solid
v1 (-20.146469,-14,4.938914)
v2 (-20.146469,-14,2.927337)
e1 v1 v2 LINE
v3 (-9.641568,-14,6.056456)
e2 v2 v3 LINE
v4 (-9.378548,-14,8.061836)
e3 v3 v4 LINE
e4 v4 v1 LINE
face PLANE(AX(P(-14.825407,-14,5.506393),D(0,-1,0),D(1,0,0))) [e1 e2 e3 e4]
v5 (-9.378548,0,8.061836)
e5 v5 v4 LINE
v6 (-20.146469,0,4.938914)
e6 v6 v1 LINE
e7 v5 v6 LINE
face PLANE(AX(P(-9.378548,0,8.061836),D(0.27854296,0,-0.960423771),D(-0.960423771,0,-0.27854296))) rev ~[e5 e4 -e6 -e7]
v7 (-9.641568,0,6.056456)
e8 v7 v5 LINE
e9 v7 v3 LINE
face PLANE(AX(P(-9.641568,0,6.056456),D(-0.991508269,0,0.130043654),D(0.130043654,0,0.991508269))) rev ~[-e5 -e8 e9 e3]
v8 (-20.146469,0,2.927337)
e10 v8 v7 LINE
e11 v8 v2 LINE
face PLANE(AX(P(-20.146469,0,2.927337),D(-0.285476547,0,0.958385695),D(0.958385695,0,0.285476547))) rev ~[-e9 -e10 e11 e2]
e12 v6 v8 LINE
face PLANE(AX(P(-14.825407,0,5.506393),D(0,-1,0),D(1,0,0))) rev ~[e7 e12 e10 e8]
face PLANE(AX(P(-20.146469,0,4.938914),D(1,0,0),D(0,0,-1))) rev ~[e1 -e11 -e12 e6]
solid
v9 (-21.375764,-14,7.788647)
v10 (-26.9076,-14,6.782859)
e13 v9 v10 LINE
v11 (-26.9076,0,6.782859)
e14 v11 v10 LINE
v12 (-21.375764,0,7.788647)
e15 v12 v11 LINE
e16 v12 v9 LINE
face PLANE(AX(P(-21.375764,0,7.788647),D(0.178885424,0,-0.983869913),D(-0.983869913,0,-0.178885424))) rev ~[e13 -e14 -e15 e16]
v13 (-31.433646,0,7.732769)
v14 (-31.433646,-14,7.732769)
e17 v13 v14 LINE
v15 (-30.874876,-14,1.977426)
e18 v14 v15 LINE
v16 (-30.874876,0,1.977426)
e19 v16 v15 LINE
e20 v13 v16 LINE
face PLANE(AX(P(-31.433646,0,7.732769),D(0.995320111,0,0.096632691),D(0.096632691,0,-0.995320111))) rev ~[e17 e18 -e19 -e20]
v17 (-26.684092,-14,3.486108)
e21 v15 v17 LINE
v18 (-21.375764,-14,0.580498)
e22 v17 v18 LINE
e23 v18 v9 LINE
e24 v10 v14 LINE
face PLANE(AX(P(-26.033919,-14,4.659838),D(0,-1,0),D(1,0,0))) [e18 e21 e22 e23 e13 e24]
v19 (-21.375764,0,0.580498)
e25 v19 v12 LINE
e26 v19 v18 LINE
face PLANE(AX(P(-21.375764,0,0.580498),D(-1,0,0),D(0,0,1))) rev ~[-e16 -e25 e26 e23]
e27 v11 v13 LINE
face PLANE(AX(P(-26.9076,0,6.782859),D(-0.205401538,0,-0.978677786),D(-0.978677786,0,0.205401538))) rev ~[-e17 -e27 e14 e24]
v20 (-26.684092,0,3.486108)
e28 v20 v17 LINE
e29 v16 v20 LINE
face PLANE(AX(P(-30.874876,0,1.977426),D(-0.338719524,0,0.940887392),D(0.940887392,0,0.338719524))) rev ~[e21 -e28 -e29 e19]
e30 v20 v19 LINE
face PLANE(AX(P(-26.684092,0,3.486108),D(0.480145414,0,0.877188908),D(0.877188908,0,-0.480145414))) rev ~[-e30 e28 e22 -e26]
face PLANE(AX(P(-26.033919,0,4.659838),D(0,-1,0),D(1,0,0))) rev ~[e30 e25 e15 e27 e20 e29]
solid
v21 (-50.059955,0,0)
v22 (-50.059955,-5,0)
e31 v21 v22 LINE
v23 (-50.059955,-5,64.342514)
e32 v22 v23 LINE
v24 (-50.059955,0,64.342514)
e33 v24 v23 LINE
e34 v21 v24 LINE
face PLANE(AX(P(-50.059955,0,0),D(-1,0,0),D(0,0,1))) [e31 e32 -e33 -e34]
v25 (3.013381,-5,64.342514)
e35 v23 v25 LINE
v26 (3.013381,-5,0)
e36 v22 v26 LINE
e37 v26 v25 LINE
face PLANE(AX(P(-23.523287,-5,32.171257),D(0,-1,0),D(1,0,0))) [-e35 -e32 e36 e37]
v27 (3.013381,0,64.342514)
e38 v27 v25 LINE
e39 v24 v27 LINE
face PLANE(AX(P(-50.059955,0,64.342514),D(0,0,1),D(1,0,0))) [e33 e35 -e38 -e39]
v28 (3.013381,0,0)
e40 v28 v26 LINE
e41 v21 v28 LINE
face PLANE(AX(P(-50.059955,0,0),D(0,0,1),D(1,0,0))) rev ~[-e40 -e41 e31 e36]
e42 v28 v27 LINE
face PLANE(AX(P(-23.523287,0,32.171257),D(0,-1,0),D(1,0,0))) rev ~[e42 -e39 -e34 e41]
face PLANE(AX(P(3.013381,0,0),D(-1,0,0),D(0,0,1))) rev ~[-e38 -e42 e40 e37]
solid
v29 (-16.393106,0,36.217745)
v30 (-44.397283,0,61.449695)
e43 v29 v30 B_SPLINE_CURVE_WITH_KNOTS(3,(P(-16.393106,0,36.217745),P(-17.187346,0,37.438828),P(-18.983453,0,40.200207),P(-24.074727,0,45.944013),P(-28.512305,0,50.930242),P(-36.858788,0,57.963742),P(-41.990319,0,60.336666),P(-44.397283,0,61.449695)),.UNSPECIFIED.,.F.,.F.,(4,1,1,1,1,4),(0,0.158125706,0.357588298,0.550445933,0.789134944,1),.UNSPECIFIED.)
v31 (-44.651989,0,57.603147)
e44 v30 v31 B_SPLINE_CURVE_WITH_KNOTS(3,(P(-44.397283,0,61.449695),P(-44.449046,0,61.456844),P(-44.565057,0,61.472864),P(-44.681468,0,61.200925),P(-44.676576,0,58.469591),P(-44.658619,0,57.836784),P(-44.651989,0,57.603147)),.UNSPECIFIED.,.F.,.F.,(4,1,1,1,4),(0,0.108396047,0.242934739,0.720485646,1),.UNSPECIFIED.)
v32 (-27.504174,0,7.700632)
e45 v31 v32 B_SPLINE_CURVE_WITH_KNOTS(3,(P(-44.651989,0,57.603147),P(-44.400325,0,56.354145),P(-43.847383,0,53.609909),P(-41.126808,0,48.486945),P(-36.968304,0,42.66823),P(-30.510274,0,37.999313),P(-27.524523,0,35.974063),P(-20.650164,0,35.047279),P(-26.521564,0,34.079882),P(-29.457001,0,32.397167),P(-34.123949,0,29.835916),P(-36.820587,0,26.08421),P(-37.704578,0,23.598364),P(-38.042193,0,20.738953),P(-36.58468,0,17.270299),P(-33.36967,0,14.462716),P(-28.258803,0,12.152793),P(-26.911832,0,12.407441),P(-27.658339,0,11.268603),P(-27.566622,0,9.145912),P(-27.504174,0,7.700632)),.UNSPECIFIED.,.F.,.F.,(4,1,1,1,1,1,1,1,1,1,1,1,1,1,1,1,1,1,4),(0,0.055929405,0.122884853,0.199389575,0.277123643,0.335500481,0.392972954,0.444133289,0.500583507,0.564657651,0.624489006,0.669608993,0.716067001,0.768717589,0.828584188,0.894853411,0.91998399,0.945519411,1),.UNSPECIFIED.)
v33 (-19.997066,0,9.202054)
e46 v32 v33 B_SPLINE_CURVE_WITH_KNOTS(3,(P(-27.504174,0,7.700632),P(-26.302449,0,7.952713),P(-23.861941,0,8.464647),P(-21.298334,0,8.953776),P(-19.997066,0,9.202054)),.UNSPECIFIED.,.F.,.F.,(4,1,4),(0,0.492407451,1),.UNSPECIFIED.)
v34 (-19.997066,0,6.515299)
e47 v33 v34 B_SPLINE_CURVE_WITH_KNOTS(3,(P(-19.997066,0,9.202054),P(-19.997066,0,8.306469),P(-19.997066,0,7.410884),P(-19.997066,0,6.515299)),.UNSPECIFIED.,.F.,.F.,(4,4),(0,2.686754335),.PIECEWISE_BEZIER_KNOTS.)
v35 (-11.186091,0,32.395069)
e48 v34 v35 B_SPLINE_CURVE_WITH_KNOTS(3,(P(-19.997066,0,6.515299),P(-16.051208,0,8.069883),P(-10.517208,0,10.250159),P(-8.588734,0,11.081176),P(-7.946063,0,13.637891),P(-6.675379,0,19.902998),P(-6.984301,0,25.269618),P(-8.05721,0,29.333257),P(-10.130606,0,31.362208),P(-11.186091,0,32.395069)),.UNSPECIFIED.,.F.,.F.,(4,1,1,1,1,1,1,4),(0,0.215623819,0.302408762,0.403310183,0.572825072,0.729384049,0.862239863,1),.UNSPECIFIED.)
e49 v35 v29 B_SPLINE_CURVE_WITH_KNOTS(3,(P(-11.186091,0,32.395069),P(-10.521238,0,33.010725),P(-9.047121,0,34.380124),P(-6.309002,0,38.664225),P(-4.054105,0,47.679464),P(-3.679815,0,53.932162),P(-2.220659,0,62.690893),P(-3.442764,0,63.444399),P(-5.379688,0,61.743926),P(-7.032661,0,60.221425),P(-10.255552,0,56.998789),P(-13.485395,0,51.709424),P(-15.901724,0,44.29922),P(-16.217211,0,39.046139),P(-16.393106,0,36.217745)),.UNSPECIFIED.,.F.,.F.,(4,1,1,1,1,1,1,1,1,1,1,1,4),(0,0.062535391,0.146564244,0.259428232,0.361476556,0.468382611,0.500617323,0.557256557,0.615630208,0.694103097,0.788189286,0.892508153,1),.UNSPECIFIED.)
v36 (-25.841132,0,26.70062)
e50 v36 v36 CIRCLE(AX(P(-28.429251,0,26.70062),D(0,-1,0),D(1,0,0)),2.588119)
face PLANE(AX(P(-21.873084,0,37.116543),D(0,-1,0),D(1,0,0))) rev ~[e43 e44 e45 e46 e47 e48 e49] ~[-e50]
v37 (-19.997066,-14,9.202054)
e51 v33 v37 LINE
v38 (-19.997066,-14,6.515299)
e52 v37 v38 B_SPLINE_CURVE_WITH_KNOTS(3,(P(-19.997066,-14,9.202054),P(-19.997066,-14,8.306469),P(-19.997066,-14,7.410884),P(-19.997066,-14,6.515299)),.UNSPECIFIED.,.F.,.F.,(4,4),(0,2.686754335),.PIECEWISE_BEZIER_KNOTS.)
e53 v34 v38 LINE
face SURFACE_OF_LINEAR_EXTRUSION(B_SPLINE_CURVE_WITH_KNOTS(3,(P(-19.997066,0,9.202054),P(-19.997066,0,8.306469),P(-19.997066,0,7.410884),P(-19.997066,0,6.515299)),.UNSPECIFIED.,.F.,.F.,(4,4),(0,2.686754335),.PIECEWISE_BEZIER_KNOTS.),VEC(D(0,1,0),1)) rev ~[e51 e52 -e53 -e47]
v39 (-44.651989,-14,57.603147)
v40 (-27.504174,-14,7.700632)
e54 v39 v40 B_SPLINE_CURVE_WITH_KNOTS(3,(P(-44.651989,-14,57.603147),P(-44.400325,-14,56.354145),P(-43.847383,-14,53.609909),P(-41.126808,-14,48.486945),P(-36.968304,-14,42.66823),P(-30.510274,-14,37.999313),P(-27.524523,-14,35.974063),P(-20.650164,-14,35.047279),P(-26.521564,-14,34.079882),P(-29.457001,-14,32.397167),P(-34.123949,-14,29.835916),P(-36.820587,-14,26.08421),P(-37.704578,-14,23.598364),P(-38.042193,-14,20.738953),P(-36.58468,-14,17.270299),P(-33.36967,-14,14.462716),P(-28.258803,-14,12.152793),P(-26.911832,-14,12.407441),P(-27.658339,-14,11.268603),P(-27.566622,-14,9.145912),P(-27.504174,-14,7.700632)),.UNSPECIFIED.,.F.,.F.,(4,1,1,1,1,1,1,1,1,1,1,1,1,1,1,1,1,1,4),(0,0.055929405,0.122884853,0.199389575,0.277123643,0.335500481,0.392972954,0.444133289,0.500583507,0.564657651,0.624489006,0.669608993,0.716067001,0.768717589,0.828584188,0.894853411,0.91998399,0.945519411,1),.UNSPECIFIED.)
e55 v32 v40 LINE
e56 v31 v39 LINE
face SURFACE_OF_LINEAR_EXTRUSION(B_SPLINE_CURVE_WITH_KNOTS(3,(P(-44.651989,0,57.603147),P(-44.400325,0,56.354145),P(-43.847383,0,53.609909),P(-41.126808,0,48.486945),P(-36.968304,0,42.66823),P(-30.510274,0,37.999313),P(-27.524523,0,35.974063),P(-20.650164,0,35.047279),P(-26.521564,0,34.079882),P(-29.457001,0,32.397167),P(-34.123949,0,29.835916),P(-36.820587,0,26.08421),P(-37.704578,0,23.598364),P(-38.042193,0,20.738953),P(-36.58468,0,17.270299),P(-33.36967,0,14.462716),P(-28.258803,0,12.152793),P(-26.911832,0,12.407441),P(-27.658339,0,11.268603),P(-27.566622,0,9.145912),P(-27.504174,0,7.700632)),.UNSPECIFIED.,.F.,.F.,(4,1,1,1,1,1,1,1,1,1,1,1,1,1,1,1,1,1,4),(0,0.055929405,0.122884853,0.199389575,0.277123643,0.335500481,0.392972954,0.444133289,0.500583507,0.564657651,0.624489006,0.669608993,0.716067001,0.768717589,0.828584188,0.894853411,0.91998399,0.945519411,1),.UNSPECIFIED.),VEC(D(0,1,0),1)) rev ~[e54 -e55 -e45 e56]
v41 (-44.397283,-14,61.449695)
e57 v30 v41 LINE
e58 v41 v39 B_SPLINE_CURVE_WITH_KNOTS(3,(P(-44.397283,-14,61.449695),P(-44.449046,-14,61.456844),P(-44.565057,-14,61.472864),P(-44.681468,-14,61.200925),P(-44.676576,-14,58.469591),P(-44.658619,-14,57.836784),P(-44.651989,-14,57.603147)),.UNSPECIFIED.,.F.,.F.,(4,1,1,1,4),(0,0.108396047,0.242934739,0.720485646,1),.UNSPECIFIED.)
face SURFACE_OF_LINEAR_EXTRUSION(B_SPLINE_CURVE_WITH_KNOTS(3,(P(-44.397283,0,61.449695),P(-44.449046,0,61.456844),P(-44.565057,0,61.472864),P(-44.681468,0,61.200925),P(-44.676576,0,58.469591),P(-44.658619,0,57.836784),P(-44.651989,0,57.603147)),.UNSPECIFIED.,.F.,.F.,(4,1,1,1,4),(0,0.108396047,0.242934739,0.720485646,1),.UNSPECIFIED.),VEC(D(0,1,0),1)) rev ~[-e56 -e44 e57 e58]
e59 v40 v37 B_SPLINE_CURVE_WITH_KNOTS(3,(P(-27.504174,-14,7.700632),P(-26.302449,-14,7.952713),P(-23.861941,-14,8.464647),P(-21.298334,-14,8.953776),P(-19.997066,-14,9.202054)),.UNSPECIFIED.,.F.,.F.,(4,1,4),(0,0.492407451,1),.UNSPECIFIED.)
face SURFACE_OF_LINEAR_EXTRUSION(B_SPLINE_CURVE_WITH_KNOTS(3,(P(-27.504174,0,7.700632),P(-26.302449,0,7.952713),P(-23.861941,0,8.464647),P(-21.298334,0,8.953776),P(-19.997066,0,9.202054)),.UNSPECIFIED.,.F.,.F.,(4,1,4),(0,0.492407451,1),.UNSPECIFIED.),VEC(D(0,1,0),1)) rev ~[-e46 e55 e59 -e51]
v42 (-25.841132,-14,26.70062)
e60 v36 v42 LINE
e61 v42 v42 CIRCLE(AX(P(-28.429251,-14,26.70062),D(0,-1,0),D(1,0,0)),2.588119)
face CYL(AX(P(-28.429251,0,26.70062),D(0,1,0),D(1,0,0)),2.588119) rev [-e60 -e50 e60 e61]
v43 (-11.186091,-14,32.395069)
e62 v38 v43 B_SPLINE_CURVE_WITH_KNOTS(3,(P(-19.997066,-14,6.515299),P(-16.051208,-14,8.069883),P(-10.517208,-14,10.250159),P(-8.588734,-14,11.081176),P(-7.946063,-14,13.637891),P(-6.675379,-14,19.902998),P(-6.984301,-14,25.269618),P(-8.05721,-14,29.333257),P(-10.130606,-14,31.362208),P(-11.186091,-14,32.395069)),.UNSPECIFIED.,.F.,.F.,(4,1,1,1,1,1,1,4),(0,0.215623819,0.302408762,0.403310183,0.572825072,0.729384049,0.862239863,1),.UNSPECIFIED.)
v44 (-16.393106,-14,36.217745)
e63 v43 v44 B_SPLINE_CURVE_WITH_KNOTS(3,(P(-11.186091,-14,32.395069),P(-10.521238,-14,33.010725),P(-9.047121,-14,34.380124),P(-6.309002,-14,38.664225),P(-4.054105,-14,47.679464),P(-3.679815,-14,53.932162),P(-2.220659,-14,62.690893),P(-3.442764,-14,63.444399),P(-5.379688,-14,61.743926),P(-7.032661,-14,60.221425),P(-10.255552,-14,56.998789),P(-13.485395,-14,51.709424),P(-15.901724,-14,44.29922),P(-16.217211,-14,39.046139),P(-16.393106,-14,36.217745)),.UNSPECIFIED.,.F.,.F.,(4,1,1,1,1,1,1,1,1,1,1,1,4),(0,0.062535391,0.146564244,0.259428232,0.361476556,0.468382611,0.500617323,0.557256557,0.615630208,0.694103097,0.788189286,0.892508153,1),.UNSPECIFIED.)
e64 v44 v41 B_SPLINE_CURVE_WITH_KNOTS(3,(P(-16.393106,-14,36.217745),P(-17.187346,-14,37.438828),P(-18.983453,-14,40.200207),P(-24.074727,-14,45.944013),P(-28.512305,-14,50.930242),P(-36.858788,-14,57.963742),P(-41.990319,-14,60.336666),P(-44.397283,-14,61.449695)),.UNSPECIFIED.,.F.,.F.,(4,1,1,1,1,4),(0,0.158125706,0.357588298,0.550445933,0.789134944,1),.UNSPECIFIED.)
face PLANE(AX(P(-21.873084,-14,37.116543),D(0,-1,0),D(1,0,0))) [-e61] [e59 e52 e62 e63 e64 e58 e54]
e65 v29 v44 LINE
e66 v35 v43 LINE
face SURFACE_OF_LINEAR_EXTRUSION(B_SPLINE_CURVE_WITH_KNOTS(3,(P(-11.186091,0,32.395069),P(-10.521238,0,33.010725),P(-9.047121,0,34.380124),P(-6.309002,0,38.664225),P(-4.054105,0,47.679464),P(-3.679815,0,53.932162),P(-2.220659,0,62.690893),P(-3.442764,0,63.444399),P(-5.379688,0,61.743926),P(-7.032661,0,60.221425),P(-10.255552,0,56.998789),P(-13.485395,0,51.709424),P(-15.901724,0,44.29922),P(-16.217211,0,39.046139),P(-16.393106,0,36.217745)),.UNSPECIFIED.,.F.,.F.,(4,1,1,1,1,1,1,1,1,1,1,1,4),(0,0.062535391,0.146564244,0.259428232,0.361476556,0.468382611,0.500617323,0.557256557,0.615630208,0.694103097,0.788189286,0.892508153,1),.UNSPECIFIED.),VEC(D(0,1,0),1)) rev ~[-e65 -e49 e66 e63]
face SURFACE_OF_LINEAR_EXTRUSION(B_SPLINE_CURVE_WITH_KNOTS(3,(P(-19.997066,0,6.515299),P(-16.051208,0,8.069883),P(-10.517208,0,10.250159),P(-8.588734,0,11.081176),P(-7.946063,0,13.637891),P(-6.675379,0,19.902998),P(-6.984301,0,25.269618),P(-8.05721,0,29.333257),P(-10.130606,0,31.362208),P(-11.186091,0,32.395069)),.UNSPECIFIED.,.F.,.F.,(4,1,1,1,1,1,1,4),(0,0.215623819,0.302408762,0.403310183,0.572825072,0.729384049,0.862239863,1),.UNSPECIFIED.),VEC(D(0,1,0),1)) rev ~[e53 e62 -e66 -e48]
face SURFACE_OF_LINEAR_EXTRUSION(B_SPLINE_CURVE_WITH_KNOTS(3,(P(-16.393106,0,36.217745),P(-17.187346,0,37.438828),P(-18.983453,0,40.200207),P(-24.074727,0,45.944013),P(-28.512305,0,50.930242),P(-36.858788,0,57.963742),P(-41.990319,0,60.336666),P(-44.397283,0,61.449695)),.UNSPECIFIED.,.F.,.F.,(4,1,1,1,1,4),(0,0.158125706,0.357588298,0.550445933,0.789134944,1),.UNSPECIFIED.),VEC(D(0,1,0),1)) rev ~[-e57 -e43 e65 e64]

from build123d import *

# Parameters (mm, degrees)
F0_R     = 2.5881190518
F1_DEPTH = 14
F2_W     = 53.0733359046
F2_H     = 64.3425136805
F3_DEPTH = 5


# Not quite as in the source:
# - a feature names something its author has since deleted; it is built from what else it names


with BuildPart() as f1:
    # F0 (on Front) → F1 (new body)
    with BuildSketch(Plane.XZ):
        with BuildLine():
            add(Edge.make_bspline(
                [(-44.3972833455, 61.4496953785), (-44.4490464675, 61.4568435425), (-44.565056792, 61.4728638439), (-44.681468286, 61.2009254932), (-44.6765757123, 58.4695911448), (-44.658618745, 57.8367841289), (-44.6519888937, 57.6031468809)],
                knots=[0, 0, 0, 0, 0.1083960468, 0.2429347395, 0.7204856463, 1, 1, 1, 1], degree=3))
            add(Edge.make_bspline(
                [(-44.6519888937, 57.6031468809), (-44.4003246793, 56.3541446109), (-43.8473826271, 53.6099090822), (-41.126808261, 48.4869449794), (-36.9683037207, 42.6682303212), (-30.5102740969, 37.9993132704), (-27.5245233409, 35.9740625461), (-20.6501644663, 35.0472789539), (-26.5215643921, 34.07988225), (-29.4570014209, 32.3971668125), (-34.1239486196, 29.8359159403), (-36.8205871097, 26.084209941), (-37.7045777644, 23.5983639301), (-38.0421931941, 20.7389531569), (-36.5846802801, 17.270299258), (-33.3696698148, 14.4627164238), (-28.2588031256, 12.1527927032), (-26.9118321529, 12.4074409024), (-27.6583389074, 11.2686028265), (-27.5666216616, 9.1459115136), (-27.5041740388, 7.7006323263)],
                knots=[0, 0, 0, 0, 0.0559294052, 0.1228848533, 0.1993895751, 0.2771236427, 0.3355004813, 0.3929729537, 0.4441332892, 0.5005835066, 0.5646576506, 0.6244890061, 0.669608993, 0.7160670006, 0.7687175891, 0.8285841882, 0.8948534111, 0.9199839904, 0.9455194108, 1, 1, 1, 1], degree=3))
            add(Edge.make_bspline(
                [(-27.5041740388, 7.7006323263), (-26.3024494279, 7.9527125617), (-23.8619408464, 8.4646468037), (-21.2983337476, 8.9537756253), (-19.9970658869, 9.2020537704)],
                knots=[0, 0, 0, 0, 0.4924074514, 1, 1, 1, 1], degree=3))
            add(Edge.make_bspline(
                [(-19.9970658869, 9.2020537704), (-19.9970658869, 8.3064689922), (-19.9970658869, 7.4108842139), (-19.9970658869, 6.5152994357)],
                knots=[0, 0, 0, 0, 2.6867543347, 2.6867543347, 2.6867543347, 2.6867543347], degree=3))
            add(Edge.make_bspline(
                [(-19.9970658869, 6.5152994357), (-16.0512076561, 8.0698825341), (-10.5172081741, 10.2501590564), (-8.5887342269, 11.0811763191), (-7.9460625464, 13.6378911094), (-6.6753789765, 19.9029977792), (-6.9843010939, 25.2696178352), (-8.0572100828, 29.3332570636), (-10.1306055922, 31.3622079575), (-11.1860912293, 32.3950685561)],
                knots=[0, 0, 0, 0, 0.2156238193, 0.3024087624, 0.4033101833, 0.5728250723, 0.7293840486, 0.8622398628, 1, 1, 1, 1], degree=3))
            add(Edge.make_bspline(
                [(-11.1860912293, 32.3950685561), (-10.5212378252, 33.0107248909), (-9.0471212528, 34.3801242718), (-6.3090018579, 38.6642251737), (-4.0541052944, 47.6794637923), (-3.679815117, 53.9321618248), (-2.2206591136, 62.6908933724), (-3.4427635635, 63.4443985763), (-5.3796876825, 61.7439260973), (-7.032660786, 60.2214249236), (-10.2555515002, 56.9987891103), (-13.4853950363, 51.7094244106), (-15.9017235257, 44.2992201365), (-16.2172110494, 39.0461386917), (-16.3931064308, 36.2177453935)],
                knots=[0, 0, 0, 0, 0.0625353907, 0.146564244, 0.2594282324, 0.3614765557, 0.4683826109, 0.5006173225, 0.5572565569, 0.6156302084, 0.694103097, 0.7881892855, 0.8925081532, 1, 1, 1, 1], degree=3))
            add(Edge.make_bspline(
                [(-16.3931064308, 36.2177453935), (-17.187345901, 37.4388284437), (-18.9834532323, 40.2002074745), (-24.0747269617, 45.9440130974), (-28.5123048659, 50.9302417978), (-36.8587882285, 57.9637418804), (-41.9903191322, 60.3366661613), (-44.3972833455, 61.4496953785)],
                knots=[0, 0, 0, 0, 0.1581257064, 0.3575882981, 0.5504459332, 0.7891349441, 1, 1, 1, 1], degree=3))
        make_face()
        with Locations((-28.4292511642, 26.7006196082)):
            Circle(F0_R, mode=Mode.SUBTRACT)
    extrude(amount=F1_DEPTH)


with BuildPart() as f1b:
    # F0 (on Front) → F1, piece 2 (new body)
    with BuildSketch(Plane.XZ):
        Polygon((-26.9076004624, 6.7828586325), (-31.4336456358, 7.7327694744), (-30.8748763055, 1.9774257671), (-26.6840923578, 3.4861082677), (-21.3757641613, 0.5804976099), (-21.3757641613, 7.7886469662), align=None)
    extrude(amount=F1_DEPTH)


with BuildPart() as f1c:
    # F0 (on Front) → F1, piece 3 (new body)
    with BuildSketch(Plane.XZ):
        Polygon((-9.3785477802, 8.0618355423), (-20.1464686543, 4.9389135092), (-20.1464686543, 2.9273370747), (-9.6415681764, 6.0564558953), align=None)
    extrude(amount=F1_DEPTH)


with BuildPart() as f3:
    # F2 (on Front) → F3 (new body)
    with BuildSketch(Plane.XZ):
        with Locations((-23.5232871491, 32.1712568402)):
            Rectangle(F2_W, F2_H)
    extrude(amount=F3_DEPTH)


solid = Compound([f1.part, f1b.part, f1c.part, f3.part])
